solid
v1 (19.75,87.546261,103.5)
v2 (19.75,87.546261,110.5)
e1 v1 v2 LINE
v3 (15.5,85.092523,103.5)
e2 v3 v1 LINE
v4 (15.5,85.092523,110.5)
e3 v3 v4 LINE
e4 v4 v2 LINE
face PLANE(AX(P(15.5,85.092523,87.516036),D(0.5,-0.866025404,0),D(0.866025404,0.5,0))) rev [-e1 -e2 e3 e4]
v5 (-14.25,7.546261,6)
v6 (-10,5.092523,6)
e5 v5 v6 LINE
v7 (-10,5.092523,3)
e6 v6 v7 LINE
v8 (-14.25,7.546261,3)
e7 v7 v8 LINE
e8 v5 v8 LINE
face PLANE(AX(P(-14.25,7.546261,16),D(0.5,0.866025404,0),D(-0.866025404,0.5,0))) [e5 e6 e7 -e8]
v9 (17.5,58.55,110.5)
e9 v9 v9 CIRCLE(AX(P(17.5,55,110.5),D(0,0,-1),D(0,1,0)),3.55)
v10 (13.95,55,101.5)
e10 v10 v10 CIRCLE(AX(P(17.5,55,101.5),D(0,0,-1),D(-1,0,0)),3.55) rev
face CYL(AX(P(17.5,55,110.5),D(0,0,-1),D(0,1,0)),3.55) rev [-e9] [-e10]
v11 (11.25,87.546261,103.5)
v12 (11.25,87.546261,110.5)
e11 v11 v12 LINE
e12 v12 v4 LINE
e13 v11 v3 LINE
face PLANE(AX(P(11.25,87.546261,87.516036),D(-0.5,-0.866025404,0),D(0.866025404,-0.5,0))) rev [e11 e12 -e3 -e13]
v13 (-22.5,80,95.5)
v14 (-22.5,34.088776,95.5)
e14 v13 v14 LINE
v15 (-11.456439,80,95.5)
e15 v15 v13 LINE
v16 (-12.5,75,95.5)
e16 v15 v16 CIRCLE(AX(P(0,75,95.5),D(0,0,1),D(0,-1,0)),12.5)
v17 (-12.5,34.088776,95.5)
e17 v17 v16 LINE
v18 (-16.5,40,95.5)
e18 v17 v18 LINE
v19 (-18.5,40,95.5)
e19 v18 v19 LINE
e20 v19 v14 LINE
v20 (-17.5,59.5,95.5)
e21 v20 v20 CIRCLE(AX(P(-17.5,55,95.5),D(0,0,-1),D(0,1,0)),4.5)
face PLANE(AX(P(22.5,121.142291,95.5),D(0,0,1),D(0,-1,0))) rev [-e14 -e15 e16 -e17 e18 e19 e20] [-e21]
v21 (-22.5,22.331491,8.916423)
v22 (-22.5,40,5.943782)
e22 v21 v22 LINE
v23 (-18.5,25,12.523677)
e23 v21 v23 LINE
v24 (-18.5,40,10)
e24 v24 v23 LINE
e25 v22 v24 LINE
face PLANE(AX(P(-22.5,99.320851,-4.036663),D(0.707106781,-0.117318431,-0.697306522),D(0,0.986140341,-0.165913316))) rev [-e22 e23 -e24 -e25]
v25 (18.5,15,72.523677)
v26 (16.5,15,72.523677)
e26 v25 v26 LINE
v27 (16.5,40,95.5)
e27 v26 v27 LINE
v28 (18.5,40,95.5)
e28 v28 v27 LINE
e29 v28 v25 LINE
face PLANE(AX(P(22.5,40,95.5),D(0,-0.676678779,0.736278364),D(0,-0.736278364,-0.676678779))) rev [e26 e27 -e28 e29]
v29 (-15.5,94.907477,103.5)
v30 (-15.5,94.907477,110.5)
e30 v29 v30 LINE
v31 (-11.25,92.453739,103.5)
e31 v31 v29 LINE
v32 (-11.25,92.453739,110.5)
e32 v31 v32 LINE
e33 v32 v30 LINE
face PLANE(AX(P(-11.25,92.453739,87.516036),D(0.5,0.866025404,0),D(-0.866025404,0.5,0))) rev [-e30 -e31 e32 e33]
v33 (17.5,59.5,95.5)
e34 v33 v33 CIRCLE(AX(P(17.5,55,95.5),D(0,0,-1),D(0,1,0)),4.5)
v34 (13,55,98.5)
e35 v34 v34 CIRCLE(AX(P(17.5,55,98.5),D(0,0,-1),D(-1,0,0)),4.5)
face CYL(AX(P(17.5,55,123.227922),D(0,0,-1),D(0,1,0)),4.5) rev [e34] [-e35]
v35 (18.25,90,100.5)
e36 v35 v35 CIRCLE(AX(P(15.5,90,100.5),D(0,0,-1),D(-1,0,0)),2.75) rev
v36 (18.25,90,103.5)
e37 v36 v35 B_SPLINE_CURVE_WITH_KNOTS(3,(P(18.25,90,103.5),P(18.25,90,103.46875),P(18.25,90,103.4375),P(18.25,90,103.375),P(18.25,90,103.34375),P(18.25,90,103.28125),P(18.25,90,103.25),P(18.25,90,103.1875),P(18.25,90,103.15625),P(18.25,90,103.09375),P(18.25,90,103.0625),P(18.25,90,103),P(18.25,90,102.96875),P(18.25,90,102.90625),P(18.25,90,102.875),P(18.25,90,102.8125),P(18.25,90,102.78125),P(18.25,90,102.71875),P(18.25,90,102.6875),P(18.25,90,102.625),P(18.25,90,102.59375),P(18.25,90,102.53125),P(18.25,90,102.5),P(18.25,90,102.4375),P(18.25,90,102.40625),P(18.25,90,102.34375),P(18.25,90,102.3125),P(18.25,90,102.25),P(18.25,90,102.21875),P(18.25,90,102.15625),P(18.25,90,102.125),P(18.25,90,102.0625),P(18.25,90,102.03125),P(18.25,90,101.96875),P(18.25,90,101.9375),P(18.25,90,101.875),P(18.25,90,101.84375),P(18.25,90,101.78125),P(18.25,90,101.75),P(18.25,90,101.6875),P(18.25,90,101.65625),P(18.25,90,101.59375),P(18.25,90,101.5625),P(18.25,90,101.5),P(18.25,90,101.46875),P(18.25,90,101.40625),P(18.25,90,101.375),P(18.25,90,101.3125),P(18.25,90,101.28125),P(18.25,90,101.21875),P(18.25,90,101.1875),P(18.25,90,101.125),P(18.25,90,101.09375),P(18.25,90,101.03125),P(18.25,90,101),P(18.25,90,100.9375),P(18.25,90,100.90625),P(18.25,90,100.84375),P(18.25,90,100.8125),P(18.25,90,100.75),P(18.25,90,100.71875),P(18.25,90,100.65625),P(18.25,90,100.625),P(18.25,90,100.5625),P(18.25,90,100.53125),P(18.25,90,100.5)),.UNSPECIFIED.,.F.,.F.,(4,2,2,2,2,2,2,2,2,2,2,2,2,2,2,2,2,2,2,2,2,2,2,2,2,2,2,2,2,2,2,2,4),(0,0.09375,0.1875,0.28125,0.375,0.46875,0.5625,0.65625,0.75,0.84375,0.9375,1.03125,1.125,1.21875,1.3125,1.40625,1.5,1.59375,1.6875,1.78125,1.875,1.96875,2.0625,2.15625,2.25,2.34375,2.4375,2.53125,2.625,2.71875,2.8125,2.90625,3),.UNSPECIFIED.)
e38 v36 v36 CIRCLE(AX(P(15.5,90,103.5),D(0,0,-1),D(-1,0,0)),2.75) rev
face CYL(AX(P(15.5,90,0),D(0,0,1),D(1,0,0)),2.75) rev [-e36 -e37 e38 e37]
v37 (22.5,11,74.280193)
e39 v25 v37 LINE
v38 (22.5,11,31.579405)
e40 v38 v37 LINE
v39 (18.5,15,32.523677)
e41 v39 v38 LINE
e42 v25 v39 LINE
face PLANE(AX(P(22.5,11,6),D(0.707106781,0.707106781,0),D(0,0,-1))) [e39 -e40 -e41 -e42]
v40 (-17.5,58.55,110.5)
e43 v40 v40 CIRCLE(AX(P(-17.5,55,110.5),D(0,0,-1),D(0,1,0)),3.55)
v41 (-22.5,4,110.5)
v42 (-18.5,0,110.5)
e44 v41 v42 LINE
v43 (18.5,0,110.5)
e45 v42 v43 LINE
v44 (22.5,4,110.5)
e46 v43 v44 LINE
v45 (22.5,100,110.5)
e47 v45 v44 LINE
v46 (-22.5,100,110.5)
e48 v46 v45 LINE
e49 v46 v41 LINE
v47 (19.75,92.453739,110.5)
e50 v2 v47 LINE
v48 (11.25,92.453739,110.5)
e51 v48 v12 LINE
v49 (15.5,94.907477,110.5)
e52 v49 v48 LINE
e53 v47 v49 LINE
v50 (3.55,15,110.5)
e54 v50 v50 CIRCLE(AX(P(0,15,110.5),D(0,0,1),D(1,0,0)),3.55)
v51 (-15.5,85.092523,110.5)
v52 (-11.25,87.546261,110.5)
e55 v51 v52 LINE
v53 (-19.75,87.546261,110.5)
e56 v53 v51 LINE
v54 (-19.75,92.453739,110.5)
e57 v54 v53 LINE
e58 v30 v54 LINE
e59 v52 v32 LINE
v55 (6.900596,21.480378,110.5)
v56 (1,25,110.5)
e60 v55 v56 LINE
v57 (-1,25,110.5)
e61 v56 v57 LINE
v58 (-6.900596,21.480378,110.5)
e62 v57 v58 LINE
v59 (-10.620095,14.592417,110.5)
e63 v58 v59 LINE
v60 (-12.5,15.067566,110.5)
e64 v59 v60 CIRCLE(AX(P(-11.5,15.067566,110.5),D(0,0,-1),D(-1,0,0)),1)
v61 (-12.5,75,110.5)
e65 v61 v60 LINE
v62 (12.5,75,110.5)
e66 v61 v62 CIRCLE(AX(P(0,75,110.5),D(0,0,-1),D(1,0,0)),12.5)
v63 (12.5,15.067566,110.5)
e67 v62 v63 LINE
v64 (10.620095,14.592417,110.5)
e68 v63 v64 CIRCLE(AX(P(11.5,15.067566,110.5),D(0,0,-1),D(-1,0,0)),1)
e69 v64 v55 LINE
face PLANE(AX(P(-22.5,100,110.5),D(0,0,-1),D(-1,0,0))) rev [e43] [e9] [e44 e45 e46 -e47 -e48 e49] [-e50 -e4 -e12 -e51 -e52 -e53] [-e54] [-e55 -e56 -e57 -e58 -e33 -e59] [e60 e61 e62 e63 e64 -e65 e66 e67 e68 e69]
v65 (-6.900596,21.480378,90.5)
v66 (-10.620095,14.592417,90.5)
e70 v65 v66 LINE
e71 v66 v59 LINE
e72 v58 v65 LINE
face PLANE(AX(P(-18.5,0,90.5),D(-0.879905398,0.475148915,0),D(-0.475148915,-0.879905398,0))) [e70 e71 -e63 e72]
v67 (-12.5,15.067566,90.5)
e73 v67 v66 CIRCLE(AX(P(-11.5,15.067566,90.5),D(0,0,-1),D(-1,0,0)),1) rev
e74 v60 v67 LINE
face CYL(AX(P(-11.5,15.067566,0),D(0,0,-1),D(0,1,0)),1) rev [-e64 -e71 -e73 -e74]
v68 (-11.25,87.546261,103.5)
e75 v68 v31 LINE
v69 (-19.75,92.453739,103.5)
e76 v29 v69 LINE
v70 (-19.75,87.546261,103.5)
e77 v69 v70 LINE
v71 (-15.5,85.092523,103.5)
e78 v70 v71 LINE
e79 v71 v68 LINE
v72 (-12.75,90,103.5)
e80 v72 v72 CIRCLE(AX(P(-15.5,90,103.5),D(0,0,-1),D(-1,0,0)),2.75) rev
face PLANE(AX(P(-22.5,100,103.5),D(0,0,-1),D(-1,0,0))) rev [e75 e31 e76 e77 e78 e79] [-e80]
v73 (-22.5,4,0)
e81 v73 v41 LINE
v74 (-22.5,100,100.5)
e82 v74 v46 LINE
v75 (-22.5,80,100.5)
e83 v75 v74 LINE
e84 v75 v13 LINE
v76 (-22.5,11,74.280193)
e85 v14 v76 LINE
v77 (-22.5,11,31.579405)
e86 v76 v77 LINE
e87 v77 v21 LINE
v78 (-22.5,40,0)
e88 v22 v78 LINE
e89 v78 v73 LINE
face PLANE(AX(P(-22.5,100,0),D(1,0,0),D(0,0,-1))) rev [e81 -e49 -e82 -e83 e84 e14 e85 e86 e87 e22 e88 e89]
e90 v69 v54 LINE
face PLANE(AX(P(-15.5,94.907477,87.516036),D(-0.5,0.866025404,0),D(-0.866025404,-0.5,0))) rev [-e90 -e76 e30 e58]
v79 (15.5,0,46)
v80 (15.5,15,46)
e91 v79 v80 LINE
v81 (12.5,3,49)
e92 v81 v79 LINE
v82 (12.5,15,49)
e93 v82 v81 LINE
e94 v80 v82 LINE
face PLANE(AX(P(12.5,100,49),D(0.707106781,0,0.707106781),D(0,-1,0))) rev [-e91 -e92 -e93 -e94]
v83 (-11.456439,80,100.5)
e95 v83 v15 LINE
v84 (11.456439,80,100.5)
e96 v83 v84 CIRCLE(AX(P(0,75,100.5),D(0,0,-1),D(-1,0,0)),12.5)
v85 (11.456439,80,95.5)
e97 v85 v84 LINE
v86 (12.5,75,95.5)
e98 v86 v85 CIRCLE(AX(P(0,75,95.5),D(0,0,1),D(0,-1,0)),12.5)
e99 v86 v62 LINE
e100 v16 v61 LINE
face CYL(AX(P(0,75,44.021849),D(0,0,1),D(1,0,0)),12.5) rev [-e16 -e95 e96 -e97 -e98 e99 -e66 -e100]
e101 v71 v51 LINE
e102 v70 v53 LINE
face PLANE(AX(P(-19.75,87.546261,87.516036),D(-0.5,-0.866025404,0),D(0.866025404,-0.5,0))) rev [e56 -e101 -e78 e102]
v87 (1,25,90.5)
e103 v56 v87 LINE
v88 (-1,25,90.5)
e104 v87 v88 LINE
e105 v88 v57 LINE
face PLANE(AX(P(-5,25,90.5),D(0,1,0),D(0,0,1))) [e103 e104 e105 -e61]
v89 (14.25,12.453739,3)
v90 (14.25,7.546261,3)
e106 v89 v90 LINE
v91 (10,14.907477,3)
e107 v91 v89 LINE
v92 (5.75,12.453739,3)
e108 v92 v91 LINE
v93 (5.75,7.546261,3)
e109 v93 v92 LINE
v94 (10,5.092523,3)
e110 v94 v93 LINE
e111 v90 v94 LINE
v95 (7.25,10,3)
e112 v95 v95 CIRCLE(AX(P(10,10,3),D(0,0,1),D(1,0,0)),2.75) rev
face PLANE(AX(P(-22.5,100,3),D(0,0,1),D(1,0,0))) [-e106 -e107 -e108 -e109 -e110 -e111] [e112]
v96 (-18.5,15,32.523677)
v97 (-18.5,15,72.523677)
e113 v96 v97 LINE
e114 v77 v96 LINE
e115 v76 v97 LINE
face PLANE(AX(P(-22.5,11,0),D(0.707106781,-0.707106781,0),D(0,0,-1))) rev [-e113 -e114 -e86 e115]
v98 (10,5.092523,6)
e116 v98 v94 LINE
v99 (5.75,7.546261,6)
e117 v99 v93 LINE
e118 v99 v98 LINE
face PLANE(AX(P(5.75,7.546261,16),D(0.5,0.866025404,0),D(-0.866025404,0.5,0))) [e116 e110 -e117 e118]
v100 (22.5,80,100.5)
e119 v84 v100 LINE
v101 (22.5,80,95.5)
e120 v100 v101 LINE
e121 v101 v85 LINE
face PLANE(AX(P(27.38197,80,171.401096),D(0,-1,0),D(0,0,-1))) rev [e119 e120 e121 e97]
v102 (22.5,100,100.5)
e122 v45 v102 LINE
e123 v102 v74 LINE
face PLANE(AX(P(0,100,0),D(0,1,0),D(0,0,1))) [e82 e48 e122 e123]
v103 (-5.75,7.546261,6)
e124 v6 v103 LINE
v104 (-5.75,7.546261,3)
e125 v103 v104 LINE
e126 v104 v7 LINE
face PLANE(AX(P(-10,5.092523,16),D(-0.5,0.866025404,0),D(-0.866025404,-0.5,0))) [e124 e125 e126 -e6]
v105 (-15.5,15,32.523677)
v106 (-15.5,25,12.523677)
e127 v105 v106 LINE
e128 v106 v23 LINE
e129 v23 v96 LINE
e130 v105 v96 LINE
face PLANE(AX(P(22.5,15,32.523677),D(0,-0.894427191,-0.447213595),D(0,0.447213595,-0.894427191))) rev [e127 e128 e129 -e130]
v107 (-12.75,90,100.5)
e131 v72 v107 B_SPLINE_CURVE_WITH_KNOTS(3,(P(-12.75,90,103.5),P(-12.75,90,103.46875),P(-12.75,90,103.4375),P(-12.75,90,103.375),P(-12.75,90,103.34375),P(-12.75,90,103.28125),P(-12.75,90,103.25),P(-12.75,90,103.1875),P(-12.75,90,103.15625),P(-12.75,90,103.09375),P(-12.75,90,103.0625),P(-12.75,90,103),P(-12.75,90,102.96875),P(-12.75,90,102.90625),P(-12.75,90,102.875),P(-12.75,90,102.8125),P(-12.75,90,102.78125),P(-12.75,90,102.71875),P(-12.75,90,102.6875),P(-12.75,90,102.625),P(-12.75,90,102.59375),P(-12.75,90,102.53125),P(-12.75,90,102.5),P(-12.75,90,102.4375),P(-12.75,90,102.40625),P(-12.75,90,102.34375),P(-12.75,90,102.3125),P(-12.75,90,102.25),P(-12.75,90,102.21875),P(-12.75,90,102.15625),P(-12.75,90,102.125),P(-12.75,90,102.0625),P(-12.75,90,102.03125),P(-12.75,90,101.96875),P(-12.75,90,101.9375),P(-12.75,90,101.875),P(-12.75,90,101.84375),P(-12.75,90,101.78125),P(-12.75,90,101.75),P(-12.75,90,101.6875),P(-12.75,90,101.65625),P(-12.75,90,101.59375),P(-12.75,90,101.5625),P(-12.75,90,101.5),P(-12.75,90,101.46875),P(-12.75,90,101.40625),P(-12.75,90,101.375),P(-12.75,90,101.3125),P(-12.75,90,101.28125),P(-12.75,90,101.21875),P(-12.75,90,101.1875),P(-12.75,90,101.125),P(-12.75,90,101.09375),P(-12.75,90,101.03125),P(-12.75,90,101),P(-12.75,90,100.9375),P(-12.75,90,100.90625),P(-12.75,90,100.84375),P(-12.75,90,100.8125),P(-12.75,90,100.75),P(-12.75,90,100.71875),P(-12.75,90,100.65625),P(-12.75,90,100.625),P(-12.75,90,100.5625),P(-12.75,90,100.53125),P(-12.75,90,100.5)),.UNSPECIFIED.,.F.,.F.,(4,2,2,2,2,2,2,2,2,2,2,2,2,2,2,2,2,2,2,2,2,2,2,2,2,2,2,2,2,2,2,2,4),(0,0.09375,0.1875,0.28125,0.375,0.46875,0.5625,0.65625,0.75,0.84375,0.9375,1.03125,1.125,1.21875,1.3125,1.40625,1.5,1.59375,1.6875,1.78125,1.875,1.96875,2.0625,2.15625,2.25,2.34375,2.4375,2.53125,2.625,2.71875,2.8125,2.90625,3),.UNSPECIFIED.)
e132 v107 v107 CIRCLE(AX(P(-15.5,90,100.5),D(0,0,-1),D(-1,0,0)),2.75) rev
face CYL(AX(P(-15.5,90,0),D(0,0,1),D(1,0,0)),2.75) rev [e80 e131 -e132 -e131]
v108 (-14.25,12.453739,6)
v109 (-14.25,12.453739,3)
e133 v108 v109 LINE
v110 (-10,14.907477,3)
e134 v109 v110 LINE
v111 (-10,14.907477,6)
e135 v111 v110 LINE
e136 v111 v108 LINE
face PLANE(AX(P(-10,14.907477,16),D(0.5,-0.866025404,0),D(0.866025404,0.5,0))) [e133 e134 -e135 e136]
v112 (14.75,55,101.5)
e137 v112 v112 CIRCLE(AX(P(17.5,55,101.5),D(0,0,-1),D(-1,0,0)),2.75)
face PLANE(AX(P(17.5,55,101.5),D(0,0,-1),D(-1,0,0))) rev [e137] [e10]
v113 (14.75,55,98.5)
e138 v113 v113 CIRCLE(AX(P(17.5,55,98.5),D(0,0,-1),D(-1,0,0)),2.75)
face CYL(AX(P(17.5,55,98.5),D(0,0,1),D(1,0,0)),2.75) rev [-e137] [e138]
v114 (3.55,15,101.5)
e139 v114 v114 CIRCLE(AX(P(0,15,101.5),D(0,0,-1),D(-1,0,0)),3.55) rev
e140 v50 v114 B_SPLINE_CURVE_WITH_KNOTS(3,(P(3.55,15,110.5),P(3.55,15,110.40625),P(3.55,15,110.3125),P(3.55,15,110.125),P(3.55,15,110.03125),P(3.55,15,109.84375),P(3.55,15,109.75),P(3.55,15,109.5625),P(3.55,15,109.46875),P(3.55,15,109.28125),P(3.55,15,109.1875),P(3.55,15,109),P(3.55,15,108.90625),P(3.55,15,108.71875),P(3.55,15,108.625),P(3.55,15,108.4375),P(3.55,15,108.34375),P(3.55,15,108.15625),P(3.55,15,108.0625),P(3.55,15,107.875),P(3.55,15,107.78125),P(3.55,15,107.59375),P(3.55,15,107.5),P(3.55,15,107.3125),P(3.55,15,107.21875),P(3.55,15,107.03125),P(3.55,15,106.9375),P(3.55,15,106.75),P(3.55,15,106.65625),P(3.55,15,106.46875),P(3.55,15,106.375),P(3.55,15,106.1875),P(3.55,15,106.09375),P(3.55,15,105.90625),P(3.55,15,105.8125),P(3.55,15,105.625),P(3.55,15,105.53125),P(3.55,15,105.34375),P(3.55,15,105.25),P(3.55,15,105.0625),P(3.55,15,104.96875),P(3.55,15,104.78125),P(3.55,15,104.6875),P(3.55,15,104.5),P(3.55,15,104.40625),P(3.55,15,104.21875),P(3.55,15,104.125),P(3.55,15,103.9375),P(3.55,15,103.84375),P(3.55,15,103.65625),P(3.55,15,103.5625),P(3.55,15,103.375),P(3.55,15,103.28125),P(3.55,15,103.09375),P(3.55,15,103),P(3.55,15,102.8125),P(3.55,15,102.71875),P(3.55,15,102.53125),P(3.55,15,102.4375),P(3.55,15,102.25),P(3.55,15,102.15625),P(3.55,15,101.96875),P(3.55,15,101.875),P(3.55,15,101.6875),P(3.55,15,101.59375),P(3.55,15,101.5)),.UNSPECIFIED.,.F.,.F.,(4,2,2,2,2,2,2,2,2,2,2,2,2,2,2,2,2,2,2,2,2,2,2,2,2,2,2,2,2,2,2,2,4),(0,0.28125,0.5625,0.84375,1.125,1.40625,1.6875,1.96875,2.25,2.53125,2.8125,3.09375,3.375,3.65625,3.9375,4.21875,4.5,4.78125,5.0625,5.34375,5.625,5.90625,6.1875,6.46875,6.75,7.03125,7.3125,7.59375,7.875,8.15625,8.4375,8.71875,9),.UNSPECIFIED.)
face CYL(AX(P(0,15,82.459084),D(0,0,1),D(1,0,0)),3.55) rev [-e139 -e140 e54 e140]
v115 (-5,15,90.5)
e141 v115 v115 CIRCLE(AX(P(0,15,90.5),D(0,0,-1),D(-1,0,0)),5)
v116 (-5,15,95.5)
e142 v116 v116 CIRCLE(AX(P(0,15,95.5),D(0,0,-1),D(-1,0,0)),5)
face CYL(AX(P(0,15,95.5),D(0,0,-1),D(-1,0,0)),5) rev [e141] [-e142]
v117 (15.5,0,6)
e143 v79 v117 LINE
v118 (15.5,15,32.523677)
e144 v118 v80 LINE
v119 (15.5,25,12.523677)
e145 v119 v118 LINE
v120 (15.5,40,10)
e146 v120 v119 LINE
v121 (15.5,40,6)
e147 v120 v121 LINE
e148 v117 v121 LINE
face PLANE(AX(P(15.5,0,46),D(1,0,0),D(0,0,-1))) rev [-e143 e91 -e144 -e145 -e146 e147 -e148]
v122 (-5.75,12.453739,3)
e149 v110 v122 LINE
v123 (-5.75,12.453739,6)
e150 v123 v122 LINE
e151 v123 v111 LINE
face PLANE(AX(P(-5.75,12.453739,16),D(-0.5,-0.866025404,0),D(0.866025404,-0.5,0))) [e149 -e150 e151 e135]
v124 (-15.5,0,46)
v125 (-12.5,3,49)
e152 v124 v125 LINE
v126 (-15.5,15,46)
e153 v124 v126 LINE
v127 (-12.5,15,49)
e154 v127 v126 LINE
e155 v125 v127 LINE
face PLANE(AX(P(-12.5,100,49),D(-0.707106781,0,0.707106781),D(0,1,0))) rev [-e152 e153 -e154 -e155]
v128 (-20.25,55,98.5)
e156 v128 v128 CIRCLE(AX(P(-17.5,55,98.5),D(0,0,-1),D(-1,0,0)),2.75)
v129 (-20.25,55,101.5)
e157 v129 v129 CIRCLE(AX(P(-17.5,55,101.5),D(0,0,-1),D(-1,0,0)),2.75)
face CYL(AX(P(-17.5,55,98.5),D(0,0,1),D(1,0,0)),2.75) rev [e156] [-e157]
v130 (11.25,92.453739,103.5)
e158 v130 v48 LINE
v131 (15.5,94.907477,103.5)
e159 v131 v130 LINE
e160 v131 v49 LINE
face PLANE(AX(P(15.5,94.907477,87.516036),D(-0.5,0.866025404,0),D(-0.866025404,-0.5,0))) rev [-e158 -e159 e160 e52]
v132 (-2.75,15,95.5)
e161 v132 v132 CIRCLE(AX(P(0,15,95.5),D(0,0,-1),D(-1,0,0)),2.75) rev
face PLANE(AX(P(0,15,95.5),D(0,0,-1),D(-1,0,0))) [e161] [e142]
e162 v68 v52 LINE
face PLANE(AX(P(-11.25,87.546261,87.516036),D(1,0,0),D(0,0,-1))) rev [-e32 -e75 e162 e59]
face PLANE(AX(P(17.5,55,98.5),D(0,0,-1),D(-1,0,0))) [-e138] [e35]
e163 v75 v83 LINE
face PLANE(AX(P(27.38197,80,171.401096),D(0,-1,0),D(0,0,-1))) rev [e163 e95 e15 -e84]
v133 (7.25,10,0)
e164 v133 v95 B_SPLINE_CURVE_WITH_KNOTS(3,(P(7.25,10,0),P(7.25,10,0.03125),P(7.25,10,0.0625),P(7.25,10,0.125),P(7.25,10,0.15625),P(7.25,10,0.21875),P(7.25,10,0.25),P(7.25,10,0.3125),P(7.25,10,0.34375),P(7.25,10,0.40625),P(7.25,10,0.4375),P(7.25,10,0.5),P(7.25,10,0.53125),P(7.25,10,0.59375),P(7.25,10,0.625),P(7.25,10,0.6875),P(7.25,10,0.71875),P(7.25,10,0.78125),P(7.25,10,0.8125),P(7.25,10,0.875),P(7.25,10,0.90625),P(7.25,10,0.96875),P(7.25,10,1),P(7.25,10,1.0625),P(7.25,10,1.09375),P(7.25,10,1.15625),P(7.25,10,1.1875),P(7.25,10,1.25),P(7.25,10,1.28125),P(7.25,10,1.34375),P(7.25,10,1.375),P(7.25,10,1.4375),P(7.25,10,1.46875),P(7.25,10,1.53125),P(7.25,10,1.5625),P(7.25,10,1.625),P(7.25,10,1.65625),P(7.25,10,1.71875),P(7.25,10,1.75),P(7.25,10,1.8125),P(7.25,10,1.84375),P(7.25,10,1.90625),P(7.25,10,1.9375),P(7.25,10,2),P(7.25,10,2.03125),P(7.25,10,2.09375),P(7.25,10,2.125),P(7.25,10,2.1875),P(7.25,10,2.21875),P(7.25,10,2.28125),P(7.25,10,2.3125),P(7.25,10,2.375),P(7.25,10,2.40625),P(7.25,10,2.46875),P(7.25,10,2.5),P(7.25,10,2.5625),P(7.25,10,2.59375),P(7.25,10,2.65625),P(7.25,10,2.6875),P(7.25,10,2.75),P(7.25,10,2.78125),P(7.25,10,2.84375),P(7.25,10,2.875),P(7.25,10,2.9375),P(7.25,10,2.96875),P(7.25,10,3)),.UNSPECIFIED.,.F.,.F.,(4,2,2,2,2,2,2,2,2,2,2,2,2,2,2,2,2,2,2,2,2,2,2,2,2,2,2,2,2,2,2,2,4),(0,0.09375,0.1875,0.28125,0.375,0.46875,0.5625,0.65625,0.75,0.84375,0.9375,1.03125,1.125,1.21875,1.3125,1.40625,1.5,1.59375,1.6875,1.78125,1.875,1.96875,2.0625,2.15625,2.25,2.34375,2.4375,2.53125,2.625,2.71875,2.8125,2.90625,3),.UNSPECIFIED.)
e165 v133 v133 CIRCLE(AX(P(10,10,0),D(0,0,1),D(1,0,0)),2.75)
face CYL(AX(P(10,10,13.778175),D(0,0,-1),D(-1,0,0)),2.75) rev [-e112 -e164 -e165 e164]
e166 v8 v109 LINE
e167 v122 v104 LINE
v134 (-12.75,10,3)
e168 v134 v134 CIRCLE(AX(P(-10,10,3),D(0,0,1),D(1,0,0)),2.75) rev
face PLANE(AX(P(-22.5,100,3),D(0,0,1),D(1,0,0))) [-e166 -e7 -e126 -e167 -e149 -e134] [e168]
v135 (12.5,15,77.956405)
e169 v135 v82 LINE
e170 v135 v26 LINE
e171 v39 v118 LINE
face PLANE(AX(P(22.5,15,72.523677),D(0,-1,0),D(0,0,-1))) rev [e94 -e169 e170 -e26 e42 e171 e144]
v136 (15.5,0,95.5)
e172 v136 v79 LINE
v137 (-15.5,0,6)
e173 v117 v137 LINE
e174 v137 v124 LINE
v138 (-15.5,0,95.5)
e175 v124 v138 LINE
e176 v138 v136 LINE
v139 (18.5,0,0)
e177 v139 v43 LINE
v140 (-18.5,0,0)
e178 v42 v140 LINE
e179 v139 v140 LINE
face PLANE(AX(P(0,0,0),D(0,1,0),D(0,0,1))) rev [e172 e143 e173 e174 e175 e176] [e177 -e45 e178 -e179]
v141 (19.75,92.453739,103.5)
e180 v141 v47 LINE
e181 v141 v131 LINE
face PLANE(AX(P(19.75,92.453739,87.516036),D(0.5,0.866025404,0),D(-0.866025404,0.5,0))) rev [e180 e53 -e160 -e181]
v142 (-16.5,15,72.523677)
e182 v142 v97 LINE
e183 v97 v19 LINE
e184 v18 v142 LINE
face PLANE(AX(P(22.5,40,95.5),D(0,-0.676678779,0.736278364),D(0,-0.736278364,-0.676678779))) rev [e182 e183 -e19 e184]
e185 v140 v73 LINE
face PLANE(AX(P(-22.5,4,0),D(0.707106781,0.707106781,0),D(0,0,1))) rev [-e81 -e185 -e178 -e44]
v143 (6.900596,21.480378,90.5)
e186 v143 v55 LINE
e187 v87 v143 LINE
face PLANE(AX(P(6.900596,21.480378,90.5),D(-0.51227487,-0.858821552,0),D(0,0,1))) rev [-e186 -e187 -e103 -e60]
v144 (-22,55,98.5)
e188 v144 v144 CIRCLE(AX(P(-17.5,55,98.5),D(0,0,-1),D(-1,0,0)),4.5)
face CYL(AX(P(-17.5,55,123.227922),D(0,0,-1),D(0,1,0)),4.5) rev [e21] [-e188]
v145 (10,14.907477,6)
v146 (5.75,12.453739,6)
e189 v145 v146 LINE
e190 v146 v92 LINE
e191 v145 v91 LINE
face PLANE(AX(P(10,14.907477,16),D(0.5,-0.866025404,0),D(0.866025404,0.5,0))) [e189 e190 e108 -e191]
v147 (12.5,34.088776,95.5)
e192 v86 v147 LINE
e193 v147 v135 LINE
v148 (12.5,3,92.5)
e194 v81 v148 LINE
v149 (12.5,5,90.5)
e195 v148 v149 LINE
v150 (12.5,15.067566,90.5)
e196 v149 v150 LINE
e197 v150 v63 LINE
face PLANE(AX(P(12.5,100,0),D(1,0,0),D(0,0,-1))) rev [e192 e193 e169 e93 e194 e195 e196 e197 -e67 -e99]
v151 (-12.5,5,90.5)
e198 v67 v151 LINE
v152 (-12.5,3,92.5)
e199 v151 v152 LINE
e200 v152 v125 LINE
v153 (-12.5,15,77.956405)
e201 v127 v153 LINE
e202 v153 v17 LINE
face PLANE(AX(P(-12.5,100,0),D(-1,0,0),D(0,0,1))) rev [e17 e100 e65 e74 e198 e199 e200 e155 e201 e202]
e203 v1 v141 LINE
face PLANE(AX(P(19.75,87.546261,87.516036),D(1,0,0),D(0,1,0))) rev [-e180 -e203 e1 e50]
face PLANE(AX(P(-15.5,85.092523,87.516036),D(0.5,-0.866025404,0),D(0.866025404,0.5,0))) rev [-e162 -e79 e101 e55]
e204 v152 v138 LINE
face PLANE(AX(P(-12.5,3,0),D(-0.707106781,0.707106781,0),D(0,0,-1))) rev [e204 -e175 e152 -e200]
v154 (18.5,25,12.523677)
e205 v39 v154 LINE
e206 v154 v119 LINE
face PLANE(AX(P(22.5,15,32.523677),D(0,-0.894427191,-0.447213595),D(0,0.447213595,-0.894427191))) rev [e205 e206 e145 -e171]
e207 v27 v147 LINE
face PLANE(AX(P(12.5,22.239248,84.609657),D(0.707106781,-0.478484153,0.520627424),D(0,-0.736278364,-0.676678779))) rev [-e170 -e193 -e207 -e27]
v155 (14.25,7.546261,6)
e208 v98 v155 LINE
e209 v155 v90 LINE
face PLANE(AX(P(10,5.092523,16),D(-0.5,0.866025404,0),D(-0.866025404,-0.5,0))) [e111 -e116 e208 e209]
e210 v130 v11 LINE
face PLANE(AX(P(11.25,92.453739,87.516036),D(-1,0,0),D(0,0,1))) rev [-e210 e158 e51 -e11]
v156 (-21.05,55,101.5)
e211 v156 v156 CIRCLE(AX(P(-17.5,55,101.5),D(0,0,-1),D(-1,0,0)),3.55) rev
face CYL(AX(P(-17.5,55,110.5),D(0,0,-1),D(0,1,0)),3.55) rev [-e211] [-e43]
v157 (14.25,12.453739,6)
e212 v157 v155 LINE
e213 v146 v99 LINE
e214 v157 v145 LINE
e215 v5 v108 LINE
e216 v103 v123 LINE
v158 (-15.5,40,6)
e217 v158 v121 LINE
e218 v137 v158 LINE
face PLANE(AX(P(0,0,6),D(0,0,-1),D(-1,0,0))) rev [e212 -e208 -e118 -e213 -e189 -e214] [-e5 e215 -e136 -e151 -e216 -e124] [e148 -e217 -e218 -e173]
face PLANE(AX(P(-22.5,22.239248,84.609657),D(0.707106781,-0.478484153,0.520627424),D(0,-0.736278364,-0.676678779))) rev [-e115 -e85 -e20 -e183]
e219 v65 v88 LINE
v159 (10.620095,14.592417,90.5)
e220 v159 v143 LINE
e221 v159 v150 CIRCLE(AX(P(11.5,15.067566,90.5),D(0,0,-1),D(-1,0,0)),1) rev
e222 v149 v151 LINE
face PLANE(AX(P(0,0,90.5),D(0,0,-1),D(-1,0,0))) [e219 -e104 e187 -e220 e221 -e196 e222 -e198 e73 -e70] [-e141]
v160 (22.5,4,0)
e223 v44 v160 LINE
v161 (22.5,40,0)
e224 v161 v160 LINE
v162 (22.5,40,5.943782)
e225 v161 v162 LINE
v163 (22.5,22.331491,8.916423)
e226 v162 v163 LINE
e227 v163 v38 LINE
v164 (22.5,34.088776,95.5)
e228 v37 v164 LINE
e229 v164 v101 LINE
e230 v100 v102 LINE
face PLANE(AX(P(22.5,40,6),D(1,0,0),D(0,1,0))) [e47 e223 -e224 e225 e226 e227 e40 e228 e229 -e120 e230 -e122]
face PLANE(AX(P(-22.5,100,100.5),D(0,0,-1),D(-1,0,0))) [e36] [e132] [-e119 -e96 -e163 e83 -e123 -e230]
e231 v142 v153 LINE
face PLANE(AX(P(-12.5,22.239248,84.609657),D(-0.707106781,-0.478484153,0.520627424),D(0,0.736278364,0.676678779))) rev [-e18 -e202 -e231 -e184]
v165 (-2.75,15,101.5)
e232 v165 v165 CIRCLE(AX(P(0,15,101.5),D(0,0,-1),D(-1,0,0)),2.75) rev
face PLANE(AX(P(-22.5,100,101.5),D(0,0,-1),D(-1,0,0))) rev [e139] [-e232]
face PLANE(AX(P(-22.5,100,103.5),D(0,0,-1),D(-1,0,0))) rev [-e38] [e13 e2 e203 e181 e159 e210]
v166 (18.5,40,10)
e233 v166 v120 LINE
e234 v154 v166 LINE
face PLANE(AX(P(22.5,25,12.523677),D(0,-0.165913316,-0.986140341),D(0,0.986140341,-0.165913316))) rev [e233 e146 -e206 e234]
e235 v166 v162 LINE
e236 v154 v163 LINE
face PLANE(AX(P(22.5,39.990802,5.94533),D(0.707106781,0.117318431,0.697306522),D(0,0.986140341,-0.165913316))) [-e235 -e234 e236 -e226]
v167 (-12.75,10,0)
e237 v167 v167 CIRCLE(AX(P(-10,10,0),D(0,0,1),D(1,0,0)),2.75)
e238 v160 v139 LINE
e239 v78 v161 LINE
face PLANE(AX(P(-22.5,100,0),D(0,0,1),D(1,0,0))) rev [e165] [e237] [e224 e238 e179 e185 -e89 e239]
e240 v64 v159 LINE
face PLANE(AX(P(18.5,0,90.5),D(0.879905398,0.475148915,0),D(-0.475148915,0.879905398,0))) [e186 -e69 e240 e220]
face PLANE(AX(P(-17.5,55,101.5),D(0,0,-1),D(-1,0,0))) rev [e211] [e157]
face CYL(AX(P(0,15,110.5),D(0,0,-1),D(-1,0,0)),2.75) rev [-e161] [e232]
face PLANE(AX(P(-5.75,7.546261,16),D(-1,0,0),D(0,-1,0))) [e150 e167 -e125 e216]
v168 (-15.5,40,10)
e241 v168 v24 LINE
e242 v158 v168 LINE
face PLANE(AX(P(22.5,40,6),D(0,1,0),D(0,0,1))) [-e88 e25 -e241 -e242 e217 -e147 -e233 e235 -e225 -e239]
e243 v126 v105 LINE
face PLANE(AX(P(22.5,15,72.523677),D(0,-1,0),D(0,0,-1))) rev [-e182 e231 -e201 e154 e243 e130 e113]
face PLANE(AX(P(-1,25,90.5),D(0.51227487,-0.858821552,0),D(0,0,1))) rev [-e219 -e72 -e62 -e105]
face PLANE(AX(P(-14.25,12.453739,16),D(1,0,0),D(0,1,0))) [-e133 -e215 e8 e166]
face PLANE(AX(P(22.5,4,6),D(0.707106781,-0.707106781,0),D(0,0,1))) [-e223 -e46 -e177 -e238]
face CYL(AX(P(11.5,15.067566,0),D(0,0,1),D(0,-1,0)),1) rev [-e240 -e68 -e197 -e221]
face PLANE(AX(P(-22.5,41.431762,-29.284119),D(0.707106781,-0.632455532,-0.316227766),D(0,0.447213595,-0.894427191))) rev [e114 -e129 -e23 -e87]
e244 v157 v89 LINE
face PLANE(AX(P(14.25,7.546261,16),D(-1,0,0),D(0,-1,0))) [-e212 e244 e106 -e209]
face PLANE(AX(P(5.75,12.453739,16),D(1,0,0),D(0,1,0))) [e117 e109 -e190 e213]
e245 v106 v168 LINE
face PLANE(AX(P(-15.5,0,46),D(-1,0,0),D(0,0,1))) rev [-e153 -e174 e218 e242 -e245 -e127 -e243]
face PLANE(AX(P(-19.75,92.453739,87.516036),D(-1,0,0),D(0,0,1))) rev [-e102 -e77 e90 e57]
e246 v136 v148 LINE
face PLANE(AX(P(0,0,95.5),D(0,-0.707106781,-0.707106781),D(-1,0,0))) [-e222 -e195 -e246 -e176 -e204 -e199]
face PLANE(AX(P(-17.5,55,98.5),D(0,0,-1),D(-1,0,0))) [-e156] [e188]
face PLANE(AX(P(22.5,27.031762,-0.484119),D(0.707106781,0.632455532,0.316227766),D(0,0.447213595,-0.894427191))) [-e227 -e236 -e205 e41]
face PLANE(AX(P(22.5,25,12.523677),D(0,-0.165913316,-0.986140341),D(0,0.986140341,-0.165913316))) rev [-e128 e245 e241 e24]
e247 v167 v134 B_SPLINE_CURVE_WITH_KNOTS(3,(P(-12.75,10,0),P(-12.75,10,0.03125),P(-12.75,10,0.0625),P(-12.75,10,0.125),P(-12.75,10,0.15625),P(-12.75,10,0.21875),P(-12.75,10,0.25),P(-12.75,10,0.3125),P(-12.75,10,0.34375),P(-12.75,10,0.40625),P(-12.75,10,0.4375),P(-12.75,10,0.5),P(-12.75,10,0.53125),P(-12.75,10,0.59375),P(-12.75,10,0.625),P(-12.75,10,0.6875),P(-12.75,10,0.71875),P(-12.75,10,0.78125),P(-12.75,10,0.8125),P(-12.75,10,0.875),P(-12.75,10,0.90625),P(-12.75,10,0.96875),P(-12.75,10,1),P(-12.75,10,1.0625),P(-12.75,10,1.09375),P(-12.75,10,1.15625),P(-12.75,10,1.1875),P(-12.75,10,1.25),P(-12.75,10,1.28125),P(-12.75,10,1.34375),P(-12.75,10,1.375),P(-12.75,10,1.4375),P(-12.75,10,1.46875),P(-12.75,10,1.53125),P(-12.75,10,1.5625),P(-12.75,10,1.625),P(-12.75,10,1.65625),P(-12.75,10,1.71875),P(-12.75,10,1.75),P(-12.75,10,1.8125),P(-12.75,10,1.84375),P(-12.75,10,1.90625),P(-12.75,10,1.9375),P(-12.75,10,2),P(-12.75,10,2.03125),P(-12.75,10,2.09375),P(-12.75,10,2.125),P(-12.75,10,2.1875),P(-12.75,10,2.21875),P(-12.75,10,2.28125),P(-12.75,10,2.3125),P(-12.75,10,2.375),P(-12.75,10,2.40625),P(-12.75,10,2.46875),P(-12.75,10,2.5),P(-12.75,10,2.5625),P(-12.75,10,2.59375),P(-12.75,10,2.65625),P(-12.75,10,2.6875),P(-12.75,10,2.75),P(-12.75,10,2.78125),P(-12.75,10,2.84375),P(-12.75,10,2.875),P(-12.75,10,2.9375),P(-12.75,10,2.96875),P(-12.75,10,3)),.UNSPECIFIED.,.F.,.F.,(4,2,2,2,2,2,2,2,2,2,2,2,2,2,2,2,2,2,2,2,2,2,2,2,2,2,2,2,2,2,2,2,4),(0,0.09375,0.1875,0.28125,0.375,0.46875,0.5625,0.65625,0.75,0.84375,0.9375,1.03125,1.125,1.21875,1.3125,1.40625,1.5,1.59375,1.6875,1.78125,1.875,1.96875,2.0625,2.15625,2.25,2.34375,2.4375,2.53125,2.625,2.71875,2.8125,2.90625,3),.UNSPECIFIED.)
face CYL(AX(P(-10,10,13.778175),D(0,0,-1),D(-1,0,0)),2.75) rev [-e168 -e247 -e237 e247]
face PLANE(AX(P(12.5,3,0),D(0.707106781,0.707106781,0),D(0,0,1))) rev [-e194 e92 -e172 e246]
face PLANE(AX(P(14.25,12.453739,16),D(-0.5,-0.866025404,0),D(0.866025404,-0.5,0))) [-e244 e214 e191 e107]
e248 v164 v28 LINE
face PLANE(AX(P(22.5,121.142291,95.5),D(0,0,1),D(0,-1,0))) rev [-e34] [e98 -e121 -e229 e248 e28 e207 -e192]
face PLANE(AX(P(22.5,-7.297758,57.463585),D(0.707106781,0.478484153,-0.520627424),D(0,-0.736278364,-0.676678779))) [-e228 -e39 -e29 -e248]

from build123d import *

# Parameters (mm, degrees)
SKETCH1_W               = 10
SKETCH1_H               = 110.5
BOSS_EXTRUDE1_DEPTH     = 100
BOSS_EXTRUDE1_2_DEPTH   = 100
SKETCH2_W               = 45
SKETCH2_H               = 40
BOSS_EXTRUDE2_DEPTH     = 6
CUT_EXTRUDE1_DEPTH      = 156.676748424
CUT_EXTRUDE1_DEPTH_BACK = 156.676748424
CHAMFER1_SIZE           = 4
CHAMFER2_SIZE           = 4
CUT_EXTRUDE2_DEPTH      = 151.71993896
CUT_EXTRUDE2_DEPTH_BACK = 6
SKETCH4_R               = 2.75
CUT_EXTRUDE3_DEPTH      = 10
CUT_EXTRUDE3_DEPTH_BACK = 3
CUT_EXTRUDE4_DEPTH      = 128.73605599
CUT_EXTRUDE4_DEPTH_BACK = 128.73605599
SKETCH6_W               = 31
SKETCH6_H               = 40
CHAMFER4_SIZE           = 3
BOSS_EXTRUDE3_DEPTH     = 15
CUT_EXTRUDE5_DEPTH      = 151.71993896
CUT_EXTRUDE5_DEPTH_BACK = 151.71993896
SKETCH8_R               = 2.75
CUT_EXTRUDE7_DEPTH      = 141.094610888
CUT_EXTRUDE7_DEPTH_BACK = 141.094610888
SKETCH10_R              = 3.55
SKETCH11_R              = 4.5
CUT_EXTRUDE8_DEPTH      = 6
SKETCH12_W              = 55.745552446
SKETCH12_H              = 24.52298679
CUT_EXTRUDE9_DEPTH      = 5
CUT_EXTRUDE6_DEPTH      = 7
BOSS_EXTRUDE4_START     = 3
SKETCH13_R              = 4.5
SKETCH13_R_2            = 2.75
BOSS_EXTRUDE4_DEPTH     = 3
BOSS_EXTRUDE5_DEPTH     = 20
CHAMFER5_SIZE           = 5
SKETCH15_R              = 2.75
CUT_EXTRUDE11_DEPTH     = 137.735145445
SKETCH16_R              = 3.55
CUT_EXTRUDE12_DEPTH     = 9
SKETCH17_R              = 5
CUT_EXTRUDE13_DEPTH     = 5
CHAMFER6_SIZE           = 4
FILLET1_R               = 1


# Some blends are built 0.0001 mm under size
with BuildPart() as part:
    # Sketch1 → Boss-Extrude1 (new body)
    with BuildSketch(Plane(origin=(0, 0, 0), x_dir=(1, 0, 0), z_dir=(0, 1, 0))):
        with Locations((-17.5, -55.25)):
            Rectangle(SKETCH1_W, SKETCH1_H)
    extrude(amount=BOSS_EXTRUDE1_DEPTH)



with BuildPart() as body_2:
    # Sketch1 → Boss-Extrude1 2 (new body)
    with BuildSketch(Plane(origin=(0, 0, 0), x_dir=(1, 0, 0), z_dir=(0, 1, 0))):
        with Locations((17.5, -55.25)):
            Rectangle(SKETCH1_W, SKETCH1_H)
    extrude(amount=BOSS_EXTRUDE1_2_DEPTH)


with BuildPart() as part_1:
    add(part.part)

    add(body_2.part)  # Boss-Extrude2 merges body 2
    # Sketch2 → Boss-Extrude2 (add)
    with BuildSketch(Plane(origin=(0, 0, 0), x_dir=(-1, 0, 0), z_dir=(0, 0, -1))):
        with Locations((0, 20)):
            Rectangle(SKETCH2_W, SKETCH2_H)
    extrude(amount=-BOSS_EXTRUDE2_DEPTH)

    # Sketch3 → Cut-Extrude1 (cut, two sides: drawn at the far end of the back side and taken through both)
    with BuildSketch(Plane.ZY.offset(22.5).offset(-CUT_EXTRUDE1_DEPTH_BACK)):
        Polygon((95.5, 121.142290582), (95.5, 40), (72.523677048, 15), (32.523677048, 15), (12.523677048, 25), (10, 40), (0, 40), (-7.984339434, 40), (-7.984339434, 121.142290582), align=None)
    extrude(amount=CUT_EXTRUDE1_DEPTH + CUT_EXTRUDE1_DEPTH_BACK, mode=Mode.SUBTRACT)

    # Chamfer1
    chamfer1_edges = [part_1.edges().sort_by_distance(p)[0] for p in [
        (-12.5, 27.5, 84.011838524),
        (12.5, 27.5, 84.011838524),
        (22.5, 32.5, 11.261838524),
        (22.5, 27.5, 84.011838524),
        (22.5, 15, 52.523677048),
        (22.5, 20, 22.523677048),
        (-22.5, 32.5, 11.261838524),
        (-22.5, 27.5, 84.011838524),
        (-22.5, 15, 52.523677048),
        (-22.5, 20, 22.523677048),
    ]]
    chamfer(chamfer1_edges, length=CHAMFER1_SIZE)

    # Chamfer2
    chamfer2_edges = [part_1.edges().sort_by_distance(p)[0] for p in [
        (22.5, 0, 55.25),
        (-22.5, 0, 55.25),
    ]]
    chamfer(chamfer2_edges, length=CHAMFER2_SIZE)

    # Sketch4 → Cut-Extrude2 (cut, two sides: drawn at the far end of the back side and taken through both)
    with BuildSketch(Plane(origin=(0, 0, 0), x_dir=(-1, 0, 0), z_dir=(0, 0, -1)).offset(-CUT_EXTRUDE2_DEPTH_BACK)):
        with Locations(Location((-10, 10, 0), (0, 0, 155.380022671))):
            Circle(SKETCH4_R)
        with Locations(Location((10, 10, 0), (0, 0, 335.380022671))):
            Circle(SKETCH4_R)
    extrude(amount=CUT_EXTRUDE2_DEPTH + CUT_EXTRUDE2_DEPTH_BACK, mode=Mode.SUBTRACT)

    # Sketch5 → Cut-Extrude3 (cut, two sides: drawn at the far end of the back side and taken through both)
    with BuildSketch(Plane.XY.offset(6).offset(-CUT_EXTRUDE3_DEPTH_BACK)):
        Polygon((-10, 14.907477288), (-14.25, 12.453738644), (-14.25, 7.546261356), (-10, 5.092522712), (-5.75, 7.546261356), (-5.75, 12.453738644), align=None)
        Polygon((10, 14.907477288), (5.75, 12.453738644), (5.75, 7.546261356), (10, 5.092522712), (14.25, 7.546261356), (14.25, 12.453738644), align=None)
    extrude(amount=CUT_EXTRUDE3_DEPTH + CUT_EXTRUDE3_DEPTH_BACK, mode=Mode.SUBTRACT)

    # Sketch6 → Cut-Extrude4 (cut, two sides: drawn at the far end of the back side and taken through both)
    with BuildSketch(Plane(origin=(0, 40, 0), x_dir=(1, 0, 0), z_dir=(0, 1, 0)).offset(-CUT_EXTRUDE4_DEPTH_BACK)):
        with Locations((0, -26)):
            Rectangle(SKETCH6_W, SKETCH6_H)
    extrude(amount=CUT_EXTRUDE4_DEPTH + CUT_EXTRUDE4_DEPTH_BACK, mode=Mode.SUBTRACT)

    # Chamfer4
    chamfer4_edges = [part_1.edges().sort_by_distance(p)[0] for p in [
        (12.5, 0, 78.25),
        (12.5, 7.5, 46),
        (-12.5, 0, 78.25),
        (-12.5, 7.5, 46),
    ]]
    chamfer(chamfer4_edges, length=CHAMFER4_SIZE - 0.0001)  # a hair under: the kernel refuses the full size

    # Sketch7 → Boss-Extrude3 (add)
    with BuildSketch(Plane.XY.offset(110.5)):
        with BuildLine():
            Line((-22.5, 100), (22.5, 100))
            Line((22.5, 100), (12.5, 75))
            ThreePointArc((12.5, 75), (0, 87.5), (-12.5, 75))
            Line((-12.5, 75), (-22.5, 100))
        make_face()
    extrude(amount=-BOSS_EXTRUDE3_DEPTH)

    # Sketch8 → Cut-Extrude5 (cut, two sides: drawn at the far end of the back side and taken through both)
    with BuildSketch(Plane.XY.offset(110.5).offset(-CUT_EXTRUDE5_DEPTH_BACK)):
        with Locations((-15.5, 90)):
            Circle(SKETCH8_R)
        with Locations((15.5, 90)):
            Circle(SKETCH8_R)
    extrude(amount=CUT_EXTRUDE5_DEPTH + CUT_EXTRUDE5_DEPTH_BACK, mode=Mode.SUBTRACT)

    # Sketch10 → Cut-Extrude7 (cut, two sides: drawn at the far end of the back side and taken through both)
    with BuildSketch(Plane(origin=(0, 0, 95.5), x_dir=(-1, 0, 0), z_dir=(0, 0, -1)).offset(-CUT_EXTRUDE7_DEPTH_BACK)):
        with Locations(Location((-17.5, 55, 0), (0, 0, 90))):
            Circle(SKETCH10_R)
        with Locations(Location((17.5, 55, 0), (0, 0, 90))):
            Circle(SKETCH10_R)
    extrude(amount=CUT_EXTRUDE7_DEPTH + CUT_EXTRUDE7_DEPTH_BACK, mode=Mode.SUBTRACT)

    # Sketch11 → Cut-Extrude8 (cut)
    with BuildSketch(Plane(origin=(0, 0, 95.5), x_dir=(-1, 0, 0), z_dir=(0, 0, -1))):
        with Locations(Location((-17.5, 55, 0), (0, 0, 90))):
            Circle(SKETCH11_R)
        with Locations(Location((17.5, 55, 0), (0, 0, 90))):
            Circle(SKETCH11_R)
    extrude(amount=-CUT_EXTRUDE8_DEPTH, mode=Mode.SUBTRACT)

    # Sketch12 → Cut-Extrude9 (cut)
    with BuildSketch(Plane(origin=(0, 0, 95.5), x_dir=(-1, 0, 0), z_dir=(0, 0, -1))):
        with Locations((0.490806416, 92.261493395)):
            Rectangle(SKETCH12_W, SKETCH12_H)
    extrude(amount=-CUT_EXTRUDE9_DEPTH, mode=Mode.SUBTRACT)

    # Sketch9 → Cut-Extrude6 (cut)
    with BuildSketch(Plane.XY.offset(110.5)):
        Polygon((-15.5, 94.907477288), (-19.75, 92.453738644), (-19.75, 87.546261356), (-15.5, 85.092522712), (-11.25, 87.546261356), (-11.25, 92.453738644), align=None)
        Polygon((15.5, 94.907477288), (11.25, 92.453738644), (11.25, 87.546261356), (15.5, 85.092522712), (19.75, 87.546261356), (19.75, 92.453738644), align=None)
    extrude(amount=-CUT_EXTRUDE6_DEPTH, mode=Mode.SUBTRACT)

    # Sketch13 → Boss-Extrude4 (add)
    # profile 1 of 2: a face of its own
    with BuildSketch(Plane(origin=(0, 0, 101.5), x_dir=(-1, 0, 0), z_dir=(0, 0, -1)).offset(BOSS_EXTRUDE4_START)):
        with Locations(Location((-17.5, 55, 0), (0, 0, 90))):
            Circle(SKETCH13_R)
        with Locations((-17.5, 55)):
            Circle(SKETCH13_R_2, mode=Mode.SUBTRACT)
    # profile 2 of 2: a face of its own
    with BuildSketch(Plane(origin=(0, 0, 101.5), x_dir=(-1, 0, 0), z_dir=(0, 0, -1)).offset(BOSS_EXTRUDE4_START)):
        with Locations(Location((17.5, 55, 0), (0, 0, 90))):
            Circle(SKETCH13_R)
        with Locations((17.5, 55)):
            Circle(SKETCH13_R_2, mode=Mode.SUBTRACT)
    extrude(amount=-BOSS_EXTRUDE4_DEPTH)

    # Sketch14 → Boss-Extrude5 (add)
    with BuildSketch(Plane.XY.offset(110.5)):
        Polygon((-5, 25), (5, 25), (18.5, 0), (-18.5, 0), align=None)
    extrude(amount=-BOSS_EXTRUDE5_DEPTH)

    # Chamfer5
    # the kernel refuses this chamfer: 5 mm, written as the material it takes off along each edge
    with BuildSketch(Plane(origin=(28.35831494, 0, 90.5), x_dir=(0, 0.9996219169112968, -0.0274958766105877), z_dir=(-1, 0, 0))) as chamfer5_piece_1_section:
        Polygon((CHAMFER5_SIZE * 0.999621916911, -CHAMFER5_SIZE * 0.0274958766106), (-CHAMFER5_SIZE * 0.0274958766106, -CHAMFER5_SIZE * 0.999621916911), (0, 0), align=None)
    chamfer5_piece_1 = extrude(amount=56.71662988, mode=Mode.PRIVATE)
    chamfer5_piece_1 = split(chamfer5_piece_1, bisect_by=Plane(origin=(14.159547874, 1.340352126, 92.611977199), z_dir=(-0.7071067811865475, -0.7071067811865476, 0)), keep=Keep.TOP, mode=Mode.PRIVATE)
    chamfer5_piece_1 = split(chamfer5_piece_1, bisect_by=Plane(origin=(12.5, 0.787169501, 92.611977199), z_dir=(1, 0, 0)), keep=Keep.TOP, mode=Mode.PRIVATE)
    add(chamfer5_piece_1, mode=Mode.SUBTRACT)
    with BuildSketch(Plane(origin=(28.35831494, 0, 90.5), x_dir=(0, 0.9996219169112968, -0.0274958766105877), z_dir=(-1, 0, 0))) as chamfer5_piece_2_section:
        Polygon((CHAMFER5_SIZE * 0.999621916911, -CHAMFER5_SIZE * 0.0274958766106), (-CHAMFER5_SIZE * 0.0274958766106, -CHAMFER5_SIZE * 0.999621916911), (0, 0), align=None)
    chamfer5_piece_2 = extrude(amount=56.71662988, mode=Mode.PRIVATE)
    chamfer5_piece_2 = split(chamfer5_piece_2, bisect_by=Plane(origin=(11.6635791, 3.8363209, 90.857133188), z_dir=(0.7071067811865475, 0.7071067811865476, 0)), keep=Keep.TOP, mode=Mode.PRIVATE)
    chamfer5_piece_2 = split(chamfer5_piece_2, bisect_by=Plane(origin=(12.5, 4.115127867, 90.857133188), z_dir=(-1, 0, 0)), keep=Keep.TOP, mode=Mode.PRIVATE)
    add(chamfer5_piece_2, mode=Mode.SUBTRACT)
    with BuildSketch(Plane(origin=(28.35831494, 0, 90.5), x_dir=(0, 0.9996219169112968, -0.0274958766105877), z_dir=(-1, 0, 0))) as chamfer5_piece_3_section:
        Polygon((CHAMFER5_SIZE * 0.999621916911, -CHAMFER5_SIZE * 0.0274958766106), (-CHAMFER5_SIZE * 0.0274958766106, -CHAMFER5_SIZE * 0.999621916911), (0, 0), align=None)
    chamfer5_piece_3 = extrude(amount=56.71662988, mode=Mode.PRIVATE)
    chamfer5_piece_3 = split(chamfer5_piece_3, bisect_by=Plane(origin=(-6.938143238, 8.561756762, 92.162249501), z_dir=(0.7071067811865475, -0.7071067811865476, 0)), keep=Keep.TOP, mode=Mode.PRIVATE)
    chamfer5_piece_3 = split(chamfer5_piece_3, bisect_by=Plane(origin=(-12.5, 1.623613523, 92.162249501), z_dir=(1, 0, 0)), keep=Keep.TOP, mode=Mode.PRIVATE)
    chamfer5_piece_3 = split(chamfer5_piece_3, bisect_by=Plane(origin=(6.938143238, 8.561756762, 92.162249501), z_dir=(-0.7071067811865475, -0.7071067811865476, 0)), keep=Keep.TOP, mode=Mode.PRIVATE)
    chamfer5_piece_3 = split(chamfer5_piece_3, bisect_by=Plane(origin=(12.5, 1.623613523, 92.162249501), z_dir=(-1, 0, 0)), keep=Keep.TOP, mode=Mode.PRIVATE)
    add(chamfer5_piece_3, mode=Mode.SUBTRACT)
    with BuildSketch(Plane(origin=(28.35831494, 0, 90.5), x_dir=(0, 0.9996219169112968, -0.0274958766105877), z_dir=(-1, 0, 0))) as chamfer5_piece_4_section:
        Polygon((CHAMFER5_SIZE * 0.999621916911, -CHAMFER5_SIZE * 0.0274958766106), (-CHAMFER5_SIZE * 0.0274958766106, -CHAMFER5_SIZE * 0.999621916911), (0, 0), align=None)
    chamfer5_piece_4 = extrude(amount=56.71662988, mode=Mode.PRIVATE)
    chamfer5_piece_4 = split(chamfer5_piece_4, bisect_by=Plane(origin=(-14.159547874, 1.340352126, 92.611977199), z_dir=(0.7071067811865475, -0.7071067811865476, 0)), keep=Keep.TOP, mode=Mode.PRIVATE)
    chamfer5_piece_4 = split(chamfer5_piece_4, bisect_by=Plane(origin=(-12.5, 0.787169501, 92.611977199), z_dir=(-1, 0, 0)), keep=Keep.TOP, mode=Mode.PRIVATE)
    add(chamfer5_piece_4, mode=Mode.SUBTRACT)
    with BuildSketch(Plane(origin=(28.35831494, 0, 90.5), x_dir=(0, 0.9996219169112968, -0.0274958766105877), z_dir=(-1, 0, 0))) as chamfer5_piece_5_section:
        Polygon((CHAMFER5_SIZE * 0.999621916911, -CHAMFER5_SIZE * 0.0274958766106), (-CHAMFER5_SIZE * 0.0274958766106, -CHAMFER5_SIZE * 0.999621916911), (0, 0), align=None)
    chamfer5_piece_5 = extrude(amount=56.71662988, mode=Mode.PRIVATE)
    chamfer5_piece_5 = split(chamfer5_piece_5, bisect_by=Plane(origin=(-11.6635791, 3.8363209, 90.857133188), z_dir=(-0.7071067811865475, 0.7071067811865476, 0)), keep=Keep.TOP, mode=Mode.PRIVATE)
    chamfer5_piece_5 = split(chamfer5_piece_5, bisect_by=Plane(origin=(-12.5, 4.115127867, 90.857133188), z_dir=(1, 0, 0)), keep=Keep.TOP, mode=Mode.PRIVATE)
    add(chamfer5_piece_5, mode=Mode.SUBTRACT)

    # Sketch15 → Cut-Extrude11 (cut, through all)
    with BuildSketch(Plane(origin=(0, 0, 90.5), x_dir=(-1, 0, 0), z_dir=(0, 0, -1))):
        with Locations((0, 15)):
            Circle(SKETCH15_R)
    extrude(amount=-CUT_EXTRUDE11_DEPTH, mode=Mode.SUBTRACT)

    # Sketch16 → Cut-Extrude12 (cut)
    with BuildSketch(Plane.XY.offset(110.5)):
        with Locations((0, 15)):
            Circle(SKETCH16_R)
    extrude(amount=-CUT_EXTRUDE12_DEPTH, mode=Mode.SUBTRACT)

    # Sketch17 → Cut-Extrude13 (cut)
    with BuildSketch(Plane(origin=(0, 0, 90.5), x_dir=(-1, 0, 0), z_dir=(0, 0, -1))):
        with Locations((0, 15)):
            Circle(SKETCH17_R)
    extrude(amount=-CUT_EXTRUDE13_DEPTH, mode=Mode.SUBTRACT)

    # Chamfer6
    chamfer6_edges = [part_1.edges().sort_by_distance(p)[0] for p in [
        (5, 25, 100.5),
        (-5, 25, 100.5),
    ]]
    chamfer(chamfer6_edges, length=CHAMFER6_SIZE)

    # Fillet1
    fillet1_edges = [part_1.edges().sort_by_distance(p)[0] for p in [
        (12.5, 11.111111111, 100.5),
        (-12.5, 11.111111111, 100.5),
    ]]
    fillet(fillet1_edges, radius=FILLET1_R)


solid = part_1.part
